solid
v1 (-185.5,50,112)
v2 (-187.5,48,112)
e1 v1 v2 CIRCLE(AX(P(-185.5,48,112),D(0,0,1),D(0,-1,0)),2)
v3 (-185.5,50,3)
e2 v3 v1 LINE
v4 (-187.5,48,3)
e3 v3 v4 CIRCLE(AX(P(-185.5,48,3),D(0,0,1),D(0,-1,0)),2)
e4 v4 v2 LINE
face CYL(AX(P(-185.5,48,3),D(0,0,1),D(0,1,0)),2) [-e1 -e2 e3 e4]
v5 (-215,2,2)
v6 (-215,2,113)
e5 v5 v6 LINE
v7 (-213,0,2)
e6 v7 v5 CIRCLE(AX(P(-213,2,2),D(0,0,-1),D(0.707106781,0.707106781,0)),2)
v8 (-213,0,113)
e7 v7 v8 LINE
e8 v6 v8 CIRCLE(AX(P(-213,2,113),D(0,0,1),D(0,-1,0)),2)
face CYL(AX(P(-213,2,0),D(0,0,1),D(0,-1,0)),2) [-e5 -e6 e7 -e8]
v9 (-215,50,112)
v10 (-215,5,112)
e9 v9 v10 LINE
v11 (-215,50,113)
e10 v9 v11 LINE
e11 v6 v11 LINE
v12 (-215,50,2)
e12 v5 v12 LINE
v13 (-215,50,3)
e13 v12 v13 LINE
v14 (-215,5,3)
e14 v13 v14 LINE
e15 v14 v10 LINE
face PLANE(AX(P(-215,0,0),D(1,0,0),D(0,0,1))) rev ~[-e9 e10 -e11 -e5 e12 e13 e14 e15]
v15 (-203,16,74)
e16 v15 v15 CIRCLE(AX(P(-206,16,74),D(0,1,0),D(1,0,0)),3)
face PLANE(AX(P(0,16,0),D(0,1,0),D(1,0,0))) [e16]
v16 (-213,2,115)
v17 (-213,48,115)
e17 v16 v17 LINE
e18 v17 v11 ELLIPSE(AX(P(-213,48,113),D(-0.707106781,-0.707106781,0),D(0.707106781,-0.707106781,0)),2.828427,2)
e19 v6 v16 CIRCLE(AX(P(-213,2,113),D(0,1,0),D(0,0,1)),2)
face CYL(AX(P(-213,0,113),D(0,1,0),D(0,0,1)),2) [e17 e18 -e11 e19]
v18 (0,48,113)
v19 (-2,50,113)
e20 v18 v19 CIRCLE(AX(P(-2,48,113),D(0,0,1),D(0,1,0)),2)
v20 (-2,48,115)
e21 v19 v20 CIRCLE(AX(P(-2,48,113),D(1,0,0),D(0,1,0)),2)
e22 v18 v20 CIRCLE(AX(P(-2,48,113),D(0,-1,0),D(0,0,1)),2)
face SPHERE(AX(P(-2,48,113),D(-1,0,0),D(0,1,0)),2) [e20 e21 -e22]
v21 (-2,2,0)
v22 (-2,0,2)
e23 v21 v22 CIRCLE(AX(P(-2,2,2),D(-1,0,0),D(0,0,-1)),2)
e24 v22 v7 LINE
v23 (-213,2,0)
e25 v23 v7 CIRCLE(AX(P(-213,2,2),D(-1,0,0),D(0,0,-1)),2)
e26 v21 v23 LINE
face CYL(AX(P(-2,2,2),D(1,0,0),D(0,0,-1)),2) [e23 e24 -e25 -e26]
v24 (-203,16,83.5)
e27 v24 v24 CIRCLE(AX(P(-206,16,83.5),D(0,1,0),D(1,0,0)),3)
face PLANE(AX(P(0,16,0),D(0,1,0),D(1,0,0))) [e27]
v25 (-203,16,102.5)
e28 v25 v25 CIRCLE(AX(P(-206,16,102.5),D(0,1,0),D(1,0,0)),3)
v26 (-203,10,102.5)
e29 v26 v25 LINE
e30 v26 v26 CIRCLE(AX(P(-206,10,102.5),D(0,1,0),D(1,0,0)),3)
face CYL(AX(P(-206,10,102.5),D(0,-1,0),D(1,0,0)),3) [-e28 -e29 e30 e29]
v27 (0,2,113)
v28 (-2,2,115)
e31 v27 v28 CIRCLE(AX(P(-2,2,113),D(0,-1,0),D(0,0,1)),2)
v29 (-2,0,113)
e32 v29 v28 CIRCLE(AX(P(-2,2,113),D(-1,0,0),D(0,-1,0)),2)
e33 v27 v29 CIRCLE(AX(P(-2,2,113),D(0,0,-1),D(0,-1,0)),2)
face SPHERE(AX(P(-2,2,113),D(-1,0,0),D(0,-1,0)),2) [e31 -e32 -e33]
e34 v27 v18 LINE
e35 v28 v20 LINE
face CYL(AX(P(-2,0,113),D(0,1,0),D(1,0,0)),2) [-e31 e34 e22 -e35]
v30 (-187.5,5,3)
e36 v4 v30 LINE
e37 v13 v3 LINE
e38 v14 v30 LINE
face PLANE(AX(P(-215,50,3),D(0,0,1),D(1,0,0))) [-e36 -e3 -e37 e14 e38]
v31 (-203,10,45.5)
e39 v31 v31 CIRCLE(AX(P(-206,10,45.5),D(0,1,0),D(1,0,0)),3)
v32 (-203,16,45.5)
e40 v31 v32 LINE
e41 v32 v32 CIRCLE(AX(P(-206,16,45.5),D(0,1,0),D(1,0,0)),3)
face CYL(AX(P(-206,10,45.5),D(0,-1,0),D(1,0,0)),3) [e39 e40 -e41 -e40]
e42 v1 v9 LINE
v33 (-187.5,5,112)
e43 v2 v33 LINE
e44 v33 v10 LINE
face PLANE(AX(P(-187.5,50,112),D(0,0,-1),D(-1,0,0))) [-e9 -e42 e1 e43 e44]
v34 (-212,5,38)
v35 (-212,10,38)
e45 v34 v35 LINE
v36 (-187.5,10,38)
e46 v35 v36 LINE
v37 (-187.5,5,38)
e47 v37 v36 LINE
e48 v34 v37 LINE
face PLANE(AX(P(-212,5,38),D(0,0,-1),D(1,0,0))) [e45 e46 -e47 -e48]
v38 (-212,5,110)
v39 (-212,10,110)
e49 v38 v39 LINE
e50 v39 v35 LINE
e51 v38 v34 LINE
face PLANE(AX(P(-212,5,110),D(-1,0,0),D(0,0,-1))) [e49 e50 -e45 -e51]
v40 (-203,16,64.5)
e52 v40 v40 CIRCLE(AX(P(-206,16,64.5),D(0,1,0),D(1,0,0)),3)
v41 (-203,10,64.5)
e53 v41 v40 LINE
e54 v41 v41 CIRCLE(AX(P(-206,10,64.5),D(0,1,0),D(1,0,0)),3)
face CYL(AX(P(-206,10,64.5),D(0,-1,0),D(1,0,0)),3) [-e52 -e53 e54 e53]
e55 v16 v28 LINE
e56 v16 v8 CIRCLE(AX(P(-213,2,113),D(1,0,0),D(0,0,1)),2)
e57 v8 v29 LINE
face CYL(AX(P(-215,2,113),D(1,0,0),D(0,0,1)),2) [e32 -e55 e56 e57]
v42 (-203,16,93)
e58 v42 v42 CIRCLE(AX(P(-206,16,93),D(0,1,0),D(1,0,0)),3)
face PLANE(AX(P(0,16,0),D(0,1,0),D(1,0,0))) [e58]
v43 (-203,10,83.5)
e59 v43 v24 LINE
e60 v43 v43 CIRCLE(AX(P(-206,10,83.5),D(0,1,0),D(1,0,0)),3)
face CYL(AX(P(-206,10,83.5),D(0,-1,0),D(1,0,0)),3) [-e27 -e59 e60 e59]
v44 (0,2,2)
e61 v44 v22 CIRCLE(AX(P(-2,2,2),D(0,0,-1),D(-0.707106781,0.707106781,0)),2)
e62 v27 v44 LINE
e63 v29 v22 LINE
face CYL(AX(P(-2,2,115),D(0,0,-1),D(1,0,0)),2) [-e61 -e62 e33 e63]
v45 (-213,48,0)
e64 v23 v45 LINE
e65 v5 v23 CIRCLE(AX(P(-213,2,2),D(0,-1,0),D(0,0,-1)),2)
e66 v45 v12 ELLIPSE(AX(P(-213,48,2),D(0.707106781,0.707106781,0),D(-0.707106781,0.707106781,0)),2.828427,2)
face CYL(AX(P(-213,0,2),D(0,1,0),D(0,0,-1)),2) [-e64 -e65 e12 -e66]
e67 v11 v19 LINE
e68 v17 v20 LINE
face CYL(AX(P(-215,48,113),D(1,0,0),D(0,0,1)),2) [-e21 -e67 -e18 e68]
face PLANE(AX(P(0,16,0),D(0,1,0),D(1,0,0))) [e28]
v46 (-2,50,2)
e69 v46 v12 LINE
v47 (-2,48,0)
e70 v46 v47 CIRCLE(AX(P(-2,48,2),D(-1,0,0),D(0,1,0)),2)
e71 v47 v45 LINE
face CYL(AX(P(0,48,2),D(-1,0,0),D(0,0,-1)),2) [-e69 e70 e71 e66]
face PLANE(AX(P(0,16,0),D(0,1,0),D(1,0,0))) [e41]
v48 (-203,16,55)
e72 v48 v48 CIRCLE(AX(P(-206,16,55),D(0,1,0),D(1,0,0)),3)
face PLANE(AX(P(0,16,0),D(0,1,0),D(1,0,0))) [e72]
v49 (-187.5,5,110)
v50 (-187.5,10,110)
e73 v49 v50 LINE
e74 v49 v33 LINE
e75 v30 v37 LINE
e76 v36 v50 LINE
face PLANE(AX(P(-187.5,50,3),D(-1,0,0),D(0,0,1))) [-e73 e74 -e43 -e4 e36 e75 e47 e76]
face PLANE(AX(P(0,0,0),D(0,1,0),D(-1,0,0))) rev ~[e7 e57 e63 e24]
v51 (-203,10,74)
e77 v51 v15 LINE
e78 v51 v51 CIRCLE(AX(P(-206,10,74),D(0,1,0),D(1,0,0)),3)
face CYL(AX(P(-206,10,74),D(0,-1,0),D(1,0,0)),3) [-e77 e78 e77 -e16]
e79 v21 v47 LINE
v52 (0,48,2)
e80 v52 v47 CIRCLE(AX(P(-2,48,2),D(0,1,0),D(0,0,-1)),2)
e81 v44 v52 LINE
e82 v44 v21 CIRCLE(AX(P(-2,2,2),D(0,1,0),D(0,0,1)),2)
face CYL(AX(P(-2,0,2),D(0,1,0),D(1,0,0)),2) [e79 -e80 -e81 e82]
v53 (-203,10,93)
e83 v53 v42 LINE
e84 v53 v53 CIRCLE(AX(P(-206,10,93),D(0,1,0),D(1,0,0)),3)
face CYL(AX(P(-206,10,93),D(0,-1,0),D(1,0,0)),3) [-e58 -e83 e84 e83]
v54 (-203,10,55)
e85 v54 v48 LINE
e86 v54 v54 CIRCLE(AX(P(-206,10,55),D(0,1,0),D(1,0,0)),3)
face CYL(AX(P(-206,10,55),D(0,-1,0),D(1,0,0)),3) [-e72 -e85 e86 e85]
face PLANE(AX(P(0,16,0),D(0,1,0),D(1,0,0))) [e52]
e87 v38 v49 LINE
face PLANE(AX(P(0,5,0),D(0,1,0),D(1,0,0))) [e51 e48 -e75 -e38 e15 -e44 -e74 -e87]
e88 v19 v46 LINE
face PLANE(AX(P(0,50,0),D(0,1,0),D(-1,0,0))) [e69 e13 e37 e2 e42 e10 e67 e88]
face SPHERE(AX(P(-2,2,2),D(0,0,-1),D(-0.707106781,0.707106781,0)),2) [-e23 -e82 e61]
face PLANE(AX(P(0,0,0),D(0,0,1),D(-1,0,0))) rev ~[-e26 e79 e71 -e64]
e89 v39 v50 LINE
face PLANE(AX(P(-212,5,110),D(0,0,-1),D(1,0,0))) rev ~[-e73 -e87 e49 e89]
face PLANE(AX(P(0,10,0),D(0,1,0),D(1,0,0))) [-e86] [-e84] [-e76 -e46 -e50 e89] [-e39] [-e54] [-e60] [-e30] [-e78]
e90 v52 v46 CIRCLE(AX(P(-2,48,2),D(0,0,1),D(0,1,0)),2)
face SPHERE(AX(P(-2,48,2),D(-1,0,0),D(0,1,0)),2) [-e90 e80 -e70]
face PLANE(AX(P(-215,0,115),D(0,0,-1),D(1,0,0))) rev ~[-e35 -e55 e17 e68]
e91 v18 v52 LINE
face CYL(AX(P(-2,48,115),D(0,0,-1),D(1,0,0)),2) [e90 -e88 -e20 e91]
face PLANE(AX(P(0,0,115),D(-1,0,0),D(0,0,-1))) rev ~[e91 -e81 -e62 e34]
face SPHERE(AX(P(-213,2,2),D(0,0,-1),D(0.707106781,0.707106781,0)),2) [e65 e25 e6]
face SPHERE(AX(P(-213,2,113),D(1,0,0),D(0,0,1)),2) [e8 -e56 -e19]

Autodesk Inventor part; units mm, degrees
ref_plane "YZ Plane" through (0, 0, 0) normal (1, 0, 0) x (0, 1, 0)
ref_plane "XZ Plane" through (0, 0, 0) normal (0, 1, 0) x (-1, 0, 0)
ref_plane "XY Plane" through (0, 0, 0) normal (0, 0, 1) x (1, 0, 0)
sketch "Sketch1" plane through (0, 0, 0) normal (0, 1, 0) x (-1, 0, 0)
  line L0 (0, 0) -> (215, 0)
  line L1 (215, 0) -> (215, 115)
  line L2 (215, 115) -> (0, 115)
  line L3 (0, 115) -> (0, 0)
  dimension "d0" = 215
  dimension "d1" = 115
extrude "Extrusion1" add sketch "Sketch1" along normal blind 50
sketch "Sketch2" plane through (0, 50, 0) normal (0, 1, 0) x (1, 0, 0)
  line L0 (0, 0) -> (-215, 0) projected
  line L1 (-215, 0) -> (-215, -115) projected
  line L2 (-215, -115) -> (0, -115) projected
  line L3 (0, -115) -> (0, 0) projected
  line L4 (-215, -3) -> (-187.5, -3)
  line L5 (-187.5, -3) -> (-187.5, -112)
  line L6 (-187.5, -112) -> (-215, -112)
  dimension "d4" = 27.5
  dimension "d5" = 3
  dimension "d6" = 3
extrude "Extrusion2" cut sketch "Sketch2" against normal blind 45 contours L4 L5 L6 L1
fillet "Fillet1" radius 2 10 edges at (-107.5, 50, 115) (-107.5, 0, 115) (-107.5, 50, 0) (0, 50, 57.5) (0, 0, 57.5) (0, 25, 115) (0, 25, 0) (-215, 25, 115) (-215, 0, 57.5) (-215, 25, 0)
fillet "Fillet2" radius 2 1 edges at (-187.5, 50, 57.5)
sketch "Sketch3" plane through (0, 5, 0) normal (0, 1, 0) x (1, 0, 0)
  line L0 (-215, -112) -> (-215, -3) projected
  line L1 (-187.5, -112) -> (-215, -112) projected
  line L2 (-187.5, -3) -> (-187.5, -112) projected
  line L3 (-215, -3) -> (-187.5, -3) projected
  line L4 (-212, -110) -> (-212, -38)
  line L5 (-212, -38) -> (-187.5, -38)
  line L6 (-212, -110) -> (-187.5, -110)
  point P0 (0, 0)
  dimension "d14" = 3
  dimension "d15" = 2
  dimension "d16" = 72
extrude "Extrusion3" add sketch "Sketch3" along normal blind 5 contours L6 L4 L5 L2
sketch "Sketch4" plane through (0, 10, 0) normal (0, 1, 0) x (1, 0, 0)
  line L0 (-212, -110) -> (-187.5, -110) projected
  line L1 (-212, -38) -> (-212, -110) projected
  circle A0 centre (-206, -45.5) radius 3
  circle A1 centre (-206, -55) radius 3
  circle A2 centre (-206, -64.5) radius 3
  circle A3 centre (-206, -74) radius 3
  circle A4 centre (-206, -83.5) radius 3
  circle A5 centre (-206, -93) radius 3
  circle A6 centre (-206, -102.5) radius 3
  point P0 (0, 0)
  dimension "d19" = 6
  dimension "d25" = 9.5
  dimension "d26" = 9.5
  dimension "d27" = 9.5
  dimension "d28" = 9.5
  dimension "d29" = 9.5
  dimension "d30" = 9.5
  dimension "d31" = 7.5
  dimension "d32" = 6
extrude "Extrusion4" add sketch "Sketch4" along normal blind 6
fillet "Fillet3" radius 2 3 edges at (-214.4142, 0.5858, 0.5858) (-0.5858, 0.5858, 0.5858) (-107.5, 0, 0)
properties part number "PSUUltibots"
